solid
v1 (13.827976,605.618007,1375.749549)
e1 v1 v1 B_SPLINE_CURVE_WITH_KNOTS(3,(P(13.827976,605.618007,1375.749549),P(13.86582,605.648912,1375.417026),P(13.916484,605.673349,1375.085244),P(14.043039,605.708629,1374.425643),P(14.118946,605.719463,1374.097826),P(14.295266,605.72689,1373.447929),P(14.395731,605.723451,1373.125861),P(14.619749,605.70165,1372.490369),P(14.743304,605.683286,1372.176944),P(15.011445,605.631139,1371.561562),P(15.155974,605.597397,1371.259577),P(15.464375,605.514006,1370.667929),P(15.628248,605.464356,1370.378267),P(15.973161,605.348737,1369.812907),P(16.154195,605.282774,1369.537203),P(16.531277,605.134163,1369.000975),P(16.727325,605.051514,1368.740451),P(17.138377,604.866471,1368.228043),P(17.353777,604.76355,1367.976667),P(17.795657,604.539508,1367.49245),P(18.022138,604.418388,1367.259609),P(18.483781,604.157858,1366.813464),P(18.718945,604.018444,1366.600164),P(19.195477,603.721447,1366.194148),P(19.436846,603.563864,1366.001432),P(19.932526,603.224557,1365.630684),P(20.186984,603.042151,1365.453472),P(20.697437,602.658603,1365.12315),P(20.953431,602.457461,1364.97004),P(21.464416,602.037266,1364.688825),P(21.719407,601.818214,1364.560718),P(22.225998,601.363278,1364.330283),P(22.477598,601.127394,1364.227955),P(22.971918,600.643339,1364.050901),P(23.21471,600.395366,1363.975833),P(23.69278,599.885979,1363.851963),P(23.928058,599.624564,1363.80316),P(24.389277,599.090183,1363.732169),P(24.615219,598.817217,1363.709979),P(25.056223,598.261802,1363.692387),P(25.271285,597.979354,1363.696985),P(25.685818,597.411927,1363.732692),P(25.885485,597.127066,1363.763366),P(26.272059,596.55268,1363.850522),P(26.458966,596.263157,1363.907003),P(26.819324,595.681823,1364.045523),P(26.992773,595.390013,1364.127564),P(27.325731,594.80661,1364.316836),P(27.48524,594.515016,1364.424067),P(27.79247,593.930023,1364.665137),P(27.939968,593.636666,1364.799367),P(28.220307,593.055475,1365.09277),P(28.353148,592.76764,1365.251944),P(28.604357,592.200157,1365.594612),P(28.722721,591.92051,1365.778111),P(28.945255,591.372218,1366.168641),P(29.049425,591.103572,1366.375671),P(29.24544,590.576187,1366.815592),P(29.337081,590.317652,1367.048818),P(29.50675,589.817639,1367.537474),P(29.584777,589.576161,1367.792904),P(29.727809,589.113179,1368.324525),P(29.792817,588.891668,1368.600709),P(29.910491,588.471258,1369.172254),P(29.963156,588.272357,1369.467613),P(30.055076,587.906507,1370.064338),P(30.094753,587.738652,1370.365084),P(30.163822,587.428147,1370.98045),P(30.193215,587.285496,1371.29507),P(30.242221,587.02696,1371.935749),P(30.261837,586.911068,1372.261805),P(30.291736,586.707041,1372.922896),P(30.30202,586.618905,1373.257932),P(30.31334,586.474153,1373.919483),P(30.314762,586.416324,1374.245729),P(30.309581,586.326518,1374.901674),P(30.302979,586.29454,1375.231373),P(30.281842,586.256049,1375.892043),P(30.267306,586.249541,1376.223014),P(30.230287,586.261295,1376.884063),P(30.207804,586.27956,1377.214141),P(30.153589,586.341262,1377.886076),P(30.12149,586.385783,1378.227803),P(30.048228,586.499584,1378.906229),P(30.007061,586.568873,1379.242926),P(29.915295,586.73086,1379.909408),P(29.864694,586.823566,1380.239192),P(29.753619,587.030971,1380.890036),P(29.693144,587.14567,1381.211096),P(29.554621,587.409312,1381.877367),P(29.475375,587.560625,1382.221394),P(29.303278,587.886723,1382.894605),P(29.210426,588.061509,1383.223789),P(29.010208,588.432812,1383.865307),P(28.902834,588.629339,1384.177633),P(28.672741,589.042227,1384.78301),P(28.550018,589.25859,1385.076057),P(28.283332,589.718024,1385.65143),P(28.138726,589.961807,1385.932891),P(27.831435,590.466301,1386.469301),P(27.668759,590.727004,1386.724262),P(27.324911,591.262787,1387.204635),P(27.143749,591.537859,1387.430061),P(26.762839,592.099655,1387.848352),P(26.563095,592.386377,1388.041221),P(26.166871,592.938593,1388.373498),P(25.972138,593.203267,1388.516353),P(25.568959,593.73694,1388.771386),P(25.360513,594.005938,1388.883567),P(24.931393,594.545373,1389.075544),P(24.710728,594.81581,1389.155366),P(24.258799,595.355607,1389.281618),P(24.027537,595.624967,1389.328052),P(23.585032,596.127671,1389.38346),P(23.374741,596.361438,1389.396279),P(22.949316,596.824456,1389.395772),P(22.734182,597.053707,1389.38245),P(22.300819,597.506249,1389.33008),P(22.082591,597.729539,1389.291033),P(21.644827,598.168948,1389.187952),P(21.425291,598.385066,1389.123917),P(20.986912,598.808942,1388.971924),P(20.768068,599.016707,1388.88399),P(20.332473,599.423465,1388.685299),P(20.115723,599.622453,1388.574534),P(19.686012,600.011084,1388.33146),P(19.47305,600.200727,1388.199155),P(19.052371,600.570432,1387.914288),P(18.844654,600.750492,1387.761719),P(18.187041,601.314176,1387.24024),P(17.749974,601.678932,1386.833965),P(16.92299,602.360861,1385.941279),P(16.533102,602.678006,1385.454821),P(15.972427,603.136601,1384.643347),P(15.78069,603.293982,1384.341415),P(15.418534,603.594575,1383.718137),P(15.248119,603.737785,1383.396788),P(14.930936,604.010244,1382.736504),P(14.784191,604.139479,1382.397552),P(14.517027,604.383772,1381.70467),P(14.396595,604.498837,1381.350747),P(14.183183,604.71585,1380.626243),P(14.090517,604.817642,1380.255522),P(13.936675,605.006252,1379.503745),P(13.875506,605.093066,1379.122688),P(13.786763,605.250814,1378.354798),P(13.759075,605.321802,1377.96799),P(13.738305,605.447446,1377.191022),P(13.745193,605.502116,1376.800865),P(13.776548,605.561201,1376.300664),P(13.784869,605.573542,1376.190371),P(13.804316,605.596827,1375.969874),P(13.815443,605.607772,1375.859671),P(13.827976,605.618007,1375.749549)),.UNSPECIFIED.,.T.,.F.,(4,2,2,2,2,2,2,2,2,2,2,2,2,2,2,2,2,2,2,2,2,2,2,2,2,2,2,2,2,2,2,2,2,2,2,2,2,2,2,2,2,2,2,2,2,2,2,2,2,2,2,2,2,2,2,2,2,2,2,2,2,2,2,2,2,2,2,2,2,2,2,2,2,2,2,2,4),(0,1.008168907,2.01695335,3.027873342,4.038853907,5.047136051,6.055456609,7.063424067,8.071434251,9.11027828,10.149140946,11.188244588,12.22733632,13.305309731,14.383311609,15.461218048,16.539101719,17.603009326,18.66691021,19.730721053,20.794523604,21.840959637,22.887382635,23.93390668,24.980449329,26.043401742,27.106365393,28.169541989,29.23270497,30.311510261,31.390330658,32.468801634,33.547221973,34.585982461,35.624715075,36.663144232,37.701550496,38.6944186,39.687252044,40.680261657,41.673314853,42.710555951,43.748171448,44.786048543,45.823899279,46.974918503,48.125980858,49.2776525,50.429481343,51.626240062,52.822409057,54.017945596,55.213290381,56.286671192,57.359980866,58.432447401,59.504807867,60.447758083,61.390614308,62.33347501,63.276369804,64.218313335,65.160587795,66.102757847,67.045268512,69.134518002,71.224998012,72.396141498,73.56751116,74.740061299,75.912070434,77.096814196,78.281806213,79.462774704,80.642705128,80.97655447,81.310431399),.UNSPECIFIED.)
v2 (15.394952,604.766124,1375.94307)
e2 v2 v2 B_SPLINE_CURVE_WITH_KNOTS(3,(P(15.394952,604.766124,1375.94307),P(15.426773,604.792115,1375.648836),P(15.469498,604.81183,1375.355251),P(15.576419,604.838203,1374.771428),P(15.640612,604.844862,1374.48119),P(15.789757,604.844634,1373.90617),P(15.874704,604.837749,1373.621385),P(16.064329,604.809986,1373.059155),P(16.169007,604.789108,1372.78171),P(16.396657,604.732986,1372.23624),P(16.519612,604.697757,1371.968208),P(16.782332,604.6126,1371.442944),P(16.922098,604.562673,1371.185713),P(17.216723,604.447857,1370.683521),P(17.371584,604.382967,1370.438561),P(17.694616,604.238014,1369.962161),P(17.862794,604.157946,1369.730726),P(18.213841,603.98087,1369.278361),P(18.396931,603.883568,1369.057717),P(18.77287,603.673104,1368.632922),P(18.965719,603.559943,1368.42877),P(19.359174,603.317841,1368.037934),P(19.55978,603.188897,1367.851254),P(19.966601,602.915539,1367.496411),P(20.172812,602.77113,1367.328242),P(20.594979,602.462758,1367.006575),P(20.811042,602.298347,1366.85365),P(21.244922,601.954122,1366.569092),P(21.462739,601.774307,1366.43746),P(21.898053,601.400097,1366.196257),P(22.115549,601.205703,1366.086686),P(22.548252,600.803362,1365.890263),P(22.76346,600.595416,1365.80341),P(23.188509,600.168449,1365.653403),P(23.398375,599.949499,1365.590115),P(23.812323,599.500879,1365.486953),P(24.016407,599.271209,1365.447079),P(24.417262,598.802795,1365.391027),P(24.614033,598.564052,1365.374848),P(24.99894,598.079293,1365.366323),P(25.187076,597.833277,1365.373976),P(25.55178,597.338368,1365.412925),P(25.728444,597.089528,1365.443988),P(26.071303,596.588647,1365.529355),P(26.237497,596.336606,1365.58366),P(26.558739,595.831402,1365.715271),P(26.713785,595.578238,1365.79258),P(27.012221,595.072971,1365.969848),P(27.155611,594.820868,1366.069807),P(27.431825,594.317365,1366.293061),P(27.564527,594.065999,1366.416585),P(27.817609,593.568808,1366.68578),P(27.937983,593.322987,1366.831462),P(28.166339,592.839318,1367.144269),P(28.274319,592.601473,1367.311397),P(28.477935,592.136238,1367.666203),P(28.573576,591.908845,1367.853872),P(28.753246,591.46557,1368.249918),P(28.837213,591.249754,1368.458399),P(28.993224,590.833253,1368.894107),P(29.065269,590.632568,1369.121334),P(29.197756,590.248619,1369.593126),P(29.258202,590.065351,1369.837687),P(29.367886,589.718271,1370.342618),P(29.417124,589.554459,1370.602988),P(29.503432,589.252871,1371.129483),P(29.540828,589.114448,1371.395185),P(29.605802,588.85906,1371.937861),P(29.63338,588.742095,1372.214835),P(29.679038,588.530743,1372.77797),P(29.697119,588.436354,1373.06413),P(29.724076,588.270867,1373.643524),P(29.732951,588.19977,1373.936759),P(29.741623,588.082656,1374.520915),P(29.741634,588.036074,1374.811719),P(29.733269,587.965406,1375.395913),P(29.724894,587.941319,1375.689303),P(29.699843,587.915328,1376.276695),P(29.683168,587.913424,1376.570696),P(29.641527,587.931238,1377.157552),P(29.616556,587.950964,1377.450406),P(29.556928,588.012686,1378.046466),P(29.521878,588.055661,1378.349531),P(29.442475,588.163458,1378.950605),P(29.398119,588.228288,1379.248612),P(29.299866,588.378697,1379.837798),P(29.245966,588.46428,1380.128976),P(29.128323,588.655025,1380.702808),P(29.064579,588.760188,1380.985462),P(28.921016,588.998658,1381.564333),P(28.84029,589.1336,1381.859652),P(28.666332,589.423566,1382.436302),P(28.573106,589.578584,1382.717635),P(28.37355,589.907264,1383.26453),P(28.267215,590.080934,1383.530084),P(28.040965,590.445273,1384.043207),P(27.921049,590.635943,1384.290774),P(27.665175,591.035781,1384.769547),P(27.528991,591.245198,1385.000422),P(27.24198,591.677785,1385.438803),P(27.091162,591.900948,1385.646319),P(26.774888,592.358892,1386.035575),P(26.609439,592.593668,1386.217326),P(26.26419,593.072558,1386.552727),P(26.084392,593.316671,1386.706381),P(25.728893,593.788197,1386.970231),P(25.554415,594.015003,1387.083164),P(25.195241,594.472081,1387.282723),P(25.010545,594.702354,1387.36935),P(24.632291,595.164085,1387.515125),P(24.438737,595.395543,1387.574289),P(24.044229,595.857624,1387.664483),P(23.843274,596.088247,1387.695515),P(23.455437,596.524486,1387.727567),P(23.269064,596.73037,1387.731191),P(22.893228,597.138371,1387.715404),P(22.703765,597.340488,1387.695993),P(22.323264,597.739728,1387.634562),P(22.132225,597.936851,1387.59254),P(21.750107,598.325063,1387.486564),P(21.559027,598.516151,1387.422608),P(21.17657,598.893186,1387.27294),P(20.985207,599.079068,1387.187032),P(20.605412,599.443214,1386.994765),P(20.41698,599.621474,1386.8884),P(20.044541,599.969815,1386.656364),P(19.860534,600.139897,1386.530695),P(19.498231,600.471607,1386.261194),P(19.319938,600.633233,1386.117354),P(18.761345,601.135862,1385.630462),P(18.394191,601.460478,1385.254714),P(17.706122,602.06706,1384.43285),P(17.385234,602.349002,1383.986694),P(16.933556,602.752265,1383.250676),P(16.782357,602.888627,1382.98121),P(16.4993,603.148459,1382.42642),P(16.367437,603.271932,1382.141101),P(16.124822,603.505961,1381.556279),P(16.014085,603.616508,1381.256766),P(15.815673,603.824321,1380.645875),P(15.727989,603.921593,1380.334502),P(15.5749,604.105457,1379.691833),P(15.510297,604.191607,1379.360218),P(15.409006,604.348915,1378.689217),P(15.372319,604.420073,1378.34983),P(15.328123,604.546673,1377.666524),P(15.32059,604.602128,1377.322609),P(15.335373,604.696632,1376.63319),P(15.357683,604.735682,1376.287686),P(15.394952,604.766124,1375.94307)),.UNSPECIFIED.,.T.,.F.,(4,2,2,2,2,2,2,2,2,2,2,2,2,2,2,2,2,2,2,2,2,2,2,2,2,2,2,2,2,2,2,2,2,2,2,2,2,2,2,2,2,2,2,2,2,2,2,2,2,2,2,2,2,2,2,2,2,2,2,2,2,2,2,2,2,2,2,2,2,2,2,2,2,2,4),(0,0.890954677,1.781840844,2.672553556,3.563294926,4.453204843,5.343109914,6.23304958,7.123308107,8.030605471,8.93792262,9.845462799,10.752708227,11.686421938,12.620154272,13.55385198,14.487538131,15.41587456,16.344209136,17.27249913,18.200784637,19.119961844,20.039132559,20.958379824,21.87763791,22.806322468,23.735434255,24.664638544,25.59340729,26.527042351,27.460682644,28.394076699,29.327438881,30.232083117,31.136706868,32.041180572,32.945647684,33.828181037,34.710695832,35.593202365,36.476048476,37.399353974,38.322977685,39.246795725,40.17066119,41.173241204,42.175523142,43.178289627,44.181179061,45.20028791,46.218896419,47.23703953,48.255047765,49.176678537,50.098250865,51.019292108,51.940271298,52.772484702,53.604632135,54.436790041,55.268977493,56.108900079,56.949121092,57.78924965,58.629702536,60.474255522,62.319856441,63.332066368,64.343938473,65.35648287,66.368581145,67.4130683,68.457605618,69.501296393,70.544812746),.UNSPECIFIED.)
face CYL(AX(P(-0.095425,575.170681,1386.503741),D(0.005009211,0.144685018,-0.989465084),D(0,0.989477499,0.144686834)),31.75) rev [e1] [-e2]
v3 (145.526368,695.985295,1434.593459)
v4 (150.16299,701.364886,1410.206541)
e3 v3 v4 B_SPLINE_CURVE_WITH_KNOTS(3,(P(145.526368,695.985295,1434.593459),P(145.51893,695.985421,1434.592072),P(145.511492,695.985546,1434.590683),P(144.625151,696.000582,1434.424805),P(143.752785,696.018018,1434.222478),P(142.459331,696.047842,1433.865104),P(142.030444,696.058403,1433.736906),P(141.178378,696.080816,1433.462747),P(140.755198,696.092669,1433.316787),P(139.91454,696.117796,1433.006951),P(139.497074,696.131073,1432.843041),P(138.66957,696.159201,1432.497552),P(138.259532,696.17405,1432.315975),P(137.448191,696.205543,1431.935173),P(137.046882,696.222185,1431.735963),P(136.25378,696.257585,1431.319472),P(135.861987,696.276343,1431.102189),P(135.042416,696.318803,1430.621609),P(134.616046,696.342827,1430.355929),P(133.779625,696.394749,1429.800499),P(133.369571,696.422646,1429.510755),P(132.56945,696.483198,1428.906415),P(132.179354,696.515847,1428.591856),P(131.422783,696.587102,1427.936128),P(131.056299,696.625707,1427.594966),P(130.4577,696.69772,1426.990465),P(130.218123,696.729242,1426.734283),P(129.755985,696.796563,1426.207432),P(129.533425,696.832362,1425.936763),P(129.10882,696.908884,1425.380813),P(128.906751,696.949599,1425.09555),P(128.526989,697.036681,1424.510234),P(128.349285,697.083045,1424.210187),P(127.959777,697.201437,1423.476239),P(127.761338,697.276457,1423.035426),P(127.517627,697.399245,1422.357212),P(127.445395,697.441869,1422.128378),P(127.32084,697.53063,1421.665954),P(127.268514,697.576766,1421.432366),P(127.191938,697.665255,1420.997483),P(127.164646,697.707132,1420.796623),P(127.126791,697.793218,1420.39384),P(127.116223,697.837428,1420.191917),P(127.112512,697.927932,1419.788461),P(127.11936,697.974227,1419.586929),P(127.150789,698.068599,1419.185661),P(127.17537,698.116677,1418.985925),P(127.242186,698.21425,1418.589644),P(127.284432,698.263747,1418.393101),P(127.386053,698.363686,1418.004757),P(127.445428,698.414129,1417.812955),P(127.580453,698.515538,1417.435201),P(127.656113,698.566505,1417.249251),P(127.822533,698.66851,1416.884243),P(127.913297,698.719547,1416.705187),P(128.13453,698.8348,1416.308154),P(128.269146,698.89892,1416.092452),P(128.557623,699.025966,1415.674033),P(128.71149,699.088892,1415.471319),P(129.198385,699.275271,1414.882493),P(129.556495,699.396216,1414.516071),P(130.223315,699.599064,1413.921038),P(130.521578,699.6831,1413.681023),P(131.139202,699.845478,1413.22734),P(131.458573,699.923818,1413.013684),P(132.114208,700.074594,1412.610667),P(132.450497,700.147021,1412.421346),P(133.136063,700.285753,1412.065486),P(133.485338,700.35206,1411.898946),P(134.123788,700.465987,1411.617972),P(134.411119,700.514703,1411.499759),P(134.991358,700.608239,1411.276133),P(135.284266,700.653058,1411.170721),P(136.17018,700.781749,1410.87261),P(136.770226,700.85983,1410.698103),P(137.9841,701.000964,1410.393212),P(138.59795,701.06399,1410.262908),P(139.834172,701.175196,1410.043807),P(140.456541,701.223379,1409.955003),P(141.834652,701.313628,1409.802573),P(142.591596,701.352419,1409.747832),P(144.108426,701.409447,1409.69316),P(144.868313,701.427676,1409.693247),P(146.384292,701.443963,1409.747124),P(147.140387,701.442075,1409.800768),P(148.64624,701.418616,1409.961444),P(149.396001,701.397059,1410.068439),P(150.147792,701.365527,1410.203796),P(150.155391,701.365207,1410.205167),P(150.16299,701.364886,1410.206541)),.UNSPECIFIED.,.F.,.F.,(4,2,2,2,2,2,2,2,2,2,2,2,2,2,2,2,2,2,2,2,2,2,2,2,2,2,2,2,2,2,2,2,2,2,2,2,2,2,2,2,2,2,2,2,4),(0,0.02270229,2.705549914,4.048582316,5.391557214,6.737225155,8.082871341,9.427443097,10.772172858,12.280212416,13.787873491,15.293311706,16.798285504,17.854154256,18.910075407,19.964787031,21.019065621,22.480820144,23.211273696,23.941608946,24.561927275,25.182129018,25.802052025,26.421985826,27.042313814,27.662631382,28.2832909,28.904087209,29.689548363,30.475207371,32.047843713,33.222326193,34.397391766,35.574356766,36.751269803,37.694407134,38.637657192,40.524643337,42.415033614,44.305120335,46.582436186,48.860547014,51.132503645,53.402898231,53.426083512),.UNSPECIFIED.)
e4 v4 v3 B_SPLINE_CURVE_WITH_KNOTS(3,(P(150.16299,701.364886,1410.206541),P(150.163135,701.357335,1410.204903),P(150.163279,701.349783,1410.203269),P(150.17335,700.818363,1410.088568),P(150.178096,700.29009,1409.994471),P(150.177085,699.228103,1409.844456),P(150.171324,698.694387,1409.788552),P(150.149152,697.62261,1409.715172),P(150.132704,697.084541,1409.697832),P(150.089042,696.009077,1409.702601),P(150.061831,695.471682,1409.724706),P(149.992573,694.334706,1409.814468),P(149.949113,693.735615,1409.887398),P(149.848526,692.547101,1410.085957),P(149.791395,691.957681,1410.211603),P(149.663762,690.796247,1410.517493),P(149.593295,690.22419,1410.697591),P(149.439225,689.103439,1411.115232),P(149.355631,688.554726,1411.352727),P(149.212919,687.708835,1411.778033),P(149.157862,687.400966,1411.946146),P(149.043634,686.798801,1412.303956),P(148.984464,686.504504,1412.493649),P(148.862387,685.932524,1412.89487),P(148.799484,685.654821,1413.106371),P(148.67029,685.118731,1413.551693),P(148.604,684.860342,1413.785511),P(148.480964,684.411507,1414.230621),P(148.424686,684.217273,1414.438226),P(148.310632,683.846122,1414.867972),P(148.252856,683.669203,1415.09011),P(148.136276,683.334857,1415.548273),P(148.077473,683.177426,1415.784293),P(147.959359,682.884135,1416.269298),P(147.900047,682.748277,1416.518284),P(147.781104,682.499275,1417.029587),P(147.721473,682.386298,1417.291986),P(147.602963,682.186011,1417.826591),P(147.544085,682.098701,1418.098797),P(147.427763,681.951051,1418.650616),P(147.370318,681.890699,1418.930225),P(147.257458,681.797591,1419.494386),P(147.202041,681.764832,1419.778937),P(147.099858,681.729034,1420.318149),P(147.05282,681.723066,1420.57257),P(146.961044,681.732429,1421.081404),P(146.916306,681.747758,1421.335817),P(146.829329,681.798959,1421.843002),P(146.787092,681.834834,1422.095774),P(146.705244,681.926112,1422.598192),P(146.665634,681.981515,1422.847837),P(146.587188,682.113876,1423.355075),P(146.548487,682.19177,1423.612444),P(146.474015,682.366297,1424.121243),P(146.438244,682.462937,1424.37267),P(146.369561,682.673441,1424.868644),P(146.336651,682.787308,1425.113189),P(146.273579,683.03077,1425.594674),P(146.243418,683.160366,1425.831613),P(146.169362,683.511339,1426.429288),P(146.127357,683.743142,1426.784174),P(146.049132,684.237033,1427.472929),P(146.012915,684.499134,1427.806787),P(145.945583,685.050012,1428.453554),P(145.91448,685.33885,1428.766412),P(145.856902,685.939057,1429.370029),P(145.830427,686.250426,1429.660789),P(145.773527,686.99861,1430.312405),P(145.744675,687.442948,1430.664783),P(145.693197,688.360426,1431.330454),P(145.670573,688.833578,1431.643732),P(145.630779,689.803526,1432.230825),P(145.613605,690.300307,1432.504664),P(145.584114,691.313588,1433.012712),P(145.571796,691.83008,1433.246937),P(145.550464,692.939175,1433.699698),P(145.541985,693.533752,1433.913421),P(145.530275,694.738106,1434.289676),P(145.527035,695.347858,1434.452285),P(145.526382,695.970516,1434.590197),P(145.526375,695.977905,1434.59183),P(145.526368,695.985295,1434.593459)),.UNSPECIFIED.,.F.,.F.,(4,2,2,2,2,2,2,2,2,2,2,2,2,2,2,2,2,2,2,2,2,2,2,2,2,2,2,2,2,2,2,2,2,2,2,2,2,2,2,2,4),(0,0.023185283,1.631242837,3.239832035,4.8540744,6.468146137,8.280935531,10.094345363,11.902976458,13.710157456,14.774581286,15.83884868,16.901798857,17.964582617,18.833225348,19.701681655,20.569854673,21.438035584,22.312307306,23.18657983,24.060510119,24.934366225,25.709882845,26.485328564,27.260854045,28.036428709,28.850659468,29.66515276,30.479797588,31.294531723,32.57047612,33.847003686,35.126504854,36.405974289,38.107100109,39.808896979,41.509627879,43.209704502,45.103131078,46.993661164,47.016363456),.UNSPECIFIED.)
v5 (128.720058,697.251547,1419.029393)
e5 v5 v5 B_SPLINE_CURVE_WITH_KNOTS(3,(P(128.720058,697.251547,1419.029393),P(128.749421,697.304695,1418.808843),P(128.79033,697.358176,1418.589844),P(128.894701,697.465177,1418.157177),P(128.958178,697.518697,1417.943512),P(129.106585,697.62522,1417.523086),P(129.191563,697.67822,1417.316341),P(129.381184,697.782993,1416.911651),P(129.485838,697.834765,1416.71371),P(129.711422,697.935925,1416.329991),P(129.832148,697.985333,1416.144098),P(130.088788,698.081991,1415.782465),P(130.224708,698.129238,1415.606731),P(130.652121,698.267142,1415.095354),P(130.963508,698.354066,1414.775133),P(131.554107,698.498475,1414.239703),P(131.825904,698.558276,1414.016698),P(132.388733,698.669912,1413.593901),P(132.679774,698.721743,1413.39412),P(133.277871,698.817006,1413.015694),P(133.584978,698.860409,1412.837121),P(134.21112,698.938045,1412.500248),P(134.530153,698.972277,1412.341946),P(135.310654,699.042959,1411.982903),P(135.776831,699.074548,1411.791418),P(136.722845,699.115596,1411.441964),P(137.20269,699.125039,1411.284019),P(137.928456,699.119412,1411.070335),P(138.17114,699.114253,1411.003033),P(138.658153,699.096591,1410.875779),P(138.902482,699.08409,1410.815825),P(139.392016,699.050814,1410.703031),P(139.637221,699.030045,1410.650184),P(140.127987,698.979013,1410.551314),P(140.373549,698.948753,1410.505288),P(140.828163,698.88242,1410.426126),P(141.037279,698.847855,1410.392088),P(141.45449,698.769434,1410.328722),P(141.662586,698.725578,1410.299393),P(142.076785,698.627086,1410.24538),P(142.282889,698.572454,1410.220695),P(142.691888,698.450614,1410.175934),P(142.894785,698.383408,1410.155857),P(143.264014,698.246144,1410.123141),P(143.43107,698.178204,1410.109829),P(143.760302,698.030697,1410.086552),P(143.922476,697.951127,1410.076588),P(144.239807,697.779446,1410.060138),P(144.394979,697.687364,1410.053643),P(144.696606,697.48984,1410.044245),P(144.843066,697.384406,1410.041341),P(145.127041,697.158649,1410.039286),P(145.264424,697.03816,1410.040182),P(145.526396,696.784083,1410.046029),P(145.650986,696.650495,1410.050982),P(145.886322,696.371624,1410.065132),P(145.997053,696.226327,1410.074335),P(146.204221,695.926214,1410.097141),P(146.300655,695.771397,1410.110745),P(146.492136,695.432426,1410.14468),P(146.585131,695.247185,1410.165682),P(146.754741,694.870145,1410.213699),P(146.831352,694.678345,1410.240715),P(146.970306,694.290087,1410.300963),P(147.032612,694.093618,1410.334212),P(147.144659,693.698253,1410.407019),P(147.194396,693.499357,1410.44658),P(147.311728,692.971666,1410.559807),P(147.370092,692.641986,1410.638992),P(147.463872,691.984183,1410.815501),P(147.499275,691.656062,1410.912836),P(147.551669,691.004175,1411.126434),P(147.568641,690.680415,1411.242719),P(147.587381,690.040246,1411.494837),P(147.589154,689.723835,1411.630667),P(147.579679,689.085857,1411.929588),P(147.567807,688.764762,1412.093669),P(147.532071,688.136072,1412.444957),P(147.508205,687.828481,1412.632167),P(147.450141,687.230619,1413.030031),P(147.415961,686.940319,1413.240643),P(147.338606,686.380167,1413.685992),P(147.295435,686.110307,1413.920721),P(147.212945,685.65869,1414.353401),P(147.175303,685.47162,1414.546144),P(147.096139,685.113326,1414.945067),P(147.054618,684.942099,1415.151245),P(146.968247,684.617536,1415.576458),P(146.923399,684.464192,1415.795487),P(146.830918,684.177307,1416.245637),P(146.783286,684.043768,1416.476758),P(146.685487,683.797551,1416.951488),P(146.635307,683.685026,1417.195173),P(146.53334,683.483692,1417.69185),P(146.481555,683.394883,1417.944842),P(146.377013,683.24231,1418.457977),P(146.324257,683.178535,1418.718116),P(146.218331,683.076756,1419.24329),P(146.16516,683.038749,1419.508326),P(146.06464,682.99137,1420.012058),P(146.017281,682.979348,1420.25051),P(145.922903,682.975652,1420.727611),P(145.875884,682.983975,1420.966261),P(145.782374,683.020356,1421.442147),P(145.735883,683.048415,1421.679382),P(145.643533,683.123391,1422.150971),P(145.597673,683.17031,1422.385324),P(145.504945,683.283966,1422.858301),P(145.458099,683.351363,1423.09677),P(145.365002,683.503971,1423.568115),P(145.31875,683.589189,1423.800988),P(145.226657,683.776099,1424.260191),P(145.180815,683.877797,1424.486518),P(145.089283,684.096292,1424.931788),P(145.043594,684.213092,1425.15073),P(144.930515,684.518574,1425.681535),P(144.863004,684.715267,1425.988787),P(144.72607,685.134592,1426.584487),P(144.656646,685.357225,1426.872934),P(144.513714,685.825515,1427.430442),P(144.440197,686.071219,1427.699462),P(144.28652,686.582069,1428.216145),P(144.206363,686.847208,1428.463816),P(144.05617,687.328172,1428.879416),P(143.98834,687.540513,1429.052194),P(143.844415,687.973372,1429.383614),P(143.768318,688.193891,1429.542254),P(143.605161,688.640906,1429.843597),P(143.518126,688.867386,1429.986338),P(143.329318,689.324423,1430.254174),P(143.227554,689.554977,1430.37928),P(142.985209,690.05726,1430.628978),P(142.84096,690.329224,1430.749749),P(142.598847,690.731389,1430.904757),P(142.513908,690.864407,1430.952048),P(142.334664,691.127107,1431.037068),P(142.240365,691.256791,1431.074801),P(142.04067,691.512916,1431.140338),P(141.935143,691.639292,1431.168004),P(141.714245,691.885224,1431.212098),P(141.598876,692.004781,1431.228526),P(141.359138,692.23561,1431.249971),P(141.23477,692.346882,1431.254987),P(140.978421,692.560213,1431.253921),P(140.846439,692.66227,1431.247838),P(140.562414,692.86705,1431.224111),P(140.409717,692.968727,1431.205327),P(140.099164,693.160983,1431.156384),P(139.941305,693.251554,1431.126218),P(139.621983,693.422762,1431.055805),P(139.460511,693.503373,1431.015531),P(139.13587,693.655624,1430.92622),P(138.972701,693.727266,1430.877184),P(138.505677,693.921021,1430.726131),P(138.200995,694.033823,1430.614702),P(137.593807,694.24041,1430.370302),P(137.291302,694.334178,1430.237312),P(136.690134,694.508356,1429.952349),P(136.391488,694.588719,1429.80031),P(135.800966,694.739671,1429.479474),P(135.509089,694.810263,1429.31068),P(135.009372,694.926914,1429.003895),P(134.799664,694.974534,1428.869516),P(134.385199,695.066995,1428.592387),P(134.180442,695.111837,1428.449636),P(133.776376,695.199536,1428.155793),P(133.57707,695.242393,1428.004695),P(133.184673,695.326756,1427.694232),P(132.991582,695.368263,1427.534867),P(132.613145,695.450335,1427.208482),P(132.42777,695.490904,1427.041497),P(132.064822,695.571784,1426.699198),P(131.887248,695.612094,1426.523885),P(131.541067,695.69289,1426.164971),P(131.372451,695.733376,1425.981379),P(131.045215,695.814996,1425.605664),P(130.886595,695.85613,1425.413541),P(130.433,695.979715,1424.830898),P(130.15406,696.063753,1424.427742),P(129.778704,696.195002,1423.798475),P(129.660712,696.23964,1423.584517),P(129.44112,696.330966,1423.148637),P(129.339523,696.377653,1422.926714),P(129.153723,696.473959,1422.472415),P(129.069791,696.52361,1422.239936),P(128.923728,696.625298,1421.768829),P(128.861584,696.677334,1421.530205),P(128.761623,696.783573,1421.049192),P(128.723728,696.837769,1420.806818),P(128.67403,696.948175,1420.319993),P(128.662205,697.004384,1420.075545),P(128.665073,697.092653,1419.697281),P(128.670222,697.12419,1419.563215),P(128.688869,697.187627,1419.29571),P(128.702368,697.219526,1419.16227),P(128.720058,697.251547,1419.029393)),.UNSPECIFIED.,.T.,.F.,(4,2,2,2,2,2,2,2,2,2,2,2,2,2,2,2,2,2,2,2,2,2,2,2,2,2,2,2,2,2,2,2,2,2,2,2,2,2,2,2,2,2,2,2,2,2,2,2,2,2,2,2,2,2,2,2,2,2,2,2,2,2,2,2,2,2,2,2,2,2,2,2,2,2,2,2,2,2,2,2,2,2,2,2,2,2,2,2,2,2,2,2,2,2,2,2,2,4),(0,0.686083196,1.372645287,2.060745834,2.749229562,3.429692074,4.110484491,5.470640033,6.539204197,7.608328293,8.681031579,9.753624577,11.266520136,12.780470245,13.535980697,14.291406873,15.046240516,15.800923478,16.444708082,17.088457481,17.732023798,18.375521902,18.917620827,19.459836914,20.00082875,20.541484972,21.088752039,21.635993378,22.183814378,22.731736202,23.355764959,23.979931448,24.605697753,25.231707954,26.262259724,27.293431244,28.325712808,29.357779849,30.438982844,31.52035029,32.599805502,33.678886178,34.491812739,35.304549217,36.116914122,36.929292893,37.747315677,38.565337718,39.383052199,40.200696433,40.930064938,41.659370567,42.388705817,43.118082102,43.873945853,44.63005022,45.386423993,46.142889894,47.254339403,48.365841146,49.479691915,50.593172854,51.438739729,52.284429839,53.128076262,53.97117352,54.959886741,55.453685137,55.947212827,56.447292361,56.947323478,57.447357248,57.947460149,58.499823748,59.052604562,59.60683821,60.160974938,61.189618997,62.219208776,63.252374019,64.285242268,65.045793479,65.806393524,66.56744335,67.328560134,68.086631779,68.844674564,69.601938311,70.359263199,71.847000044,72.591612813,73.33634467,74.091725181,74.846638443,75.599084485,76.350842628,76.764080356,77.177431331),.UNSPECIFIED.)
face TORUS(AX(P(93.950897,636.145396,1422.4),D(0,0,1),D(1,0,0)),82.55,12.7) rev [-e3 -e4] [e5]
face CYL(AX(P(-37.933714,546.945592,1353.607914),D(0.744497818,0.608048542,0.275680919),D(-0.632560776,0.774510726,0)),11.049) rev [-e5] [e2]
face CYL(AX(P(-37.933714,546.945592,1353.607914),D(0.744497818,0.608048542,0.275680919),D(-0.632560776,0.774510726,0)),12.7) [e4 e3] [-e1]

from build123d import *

# Parameters (mm, degrees)
BOSS_EXTRUDE1_OUTLINE_R   = 12.7
BOSS_EXTRUDE1_OUTLINE_R_2 = 11.049
BOSS_EXTRUDE1_DEPTH       = 169.483736402
BOSS_EXTRUDE1_START       = -1289
BOSS_EXTRUDE1_2_DEPTH     = 28
SKETCH3_R                 = 12.7


with BuildPart() as part:
    # Boss-Extrude1: read off the stored shape, not the designer's step
    # Boss-Extrude1 outline → Boss-Extrude1 (new body)
    with BuildSketch(Plane(origin=(147.844678818, 698.675090596, 1422.4), x_dir=(-0.21607186737585407, -0.17125420007266845, 0.961241357353179), z_dir=(-0.7444978184598123, -0.6080485419276475, -0.27568091875979095))):
        Circle(BOSS_EXTRUDE1_OUTLINE_R)
        Circle(BOSS_EXTRUDE1_OUTLINE_R_2, mode=Mode.SUBTRACT)
    extrude(amount=BOSS_EXTRUDE1_DEPTH)

    # Boss-Extrude1 2 outline → Boss-Extrude1 2 (cut)
    with BuildSketch(Plane(origin=(0, 0, 0), x_dir=(0.9999874538242801, -0.000724766866537943, 0.0049565014901968504), z_dir=(0.00500921091921221, 0.144685018294151, -0.98946508442046)).offset(BOSS_EXTRUDE1_START)):
        with BuildLine():
            Line((18, -799.36109198), (20.130666841, -798.335481217))
            ThreePointArc((20.130666841, -798.335481217), (30.42475196, -790.438302135), (36.700315808, -779.082646087))
            Line((36.700315808, -779.082646087), (37.342492978, -777))
            Line((37.342492978, -777), (18, -777))
            Line((18, -777), (18, -799.36109198))
        make_face()
    extrude(amount=BOSS_EXTRUDE1_2_DEPTH, mode=Mode.SUBTRACT)

    # Cut-Sweep1: sweep along a path in Sketch2
    with BuildLine(Plane.XY.offset(1422.4)) as cut_sweep1_path:
        ThreePointArc((175.5974564, 648.324959307), (147.844678818, 698.675090596), (93.95089657, 718.69539577))
    # Sketch3 → Cut-Sweep1 (sweep, cut)
    with BuildSketch(Plane(origin=(175.5974564, 648.324959307, 1422.4), x_dir=(0.9890558428813507, 0.14754165399052874, -1.0318371108759884e-15), z_dir=(-0.14754165399052874, 0.9890558428813507, -6.916992563193179e-15))):
        Circle(SKETCH3_R)
    sweep(path=cut_sweep1_path.line, mode=Mode.SUBTRACT)


solid = part.part
